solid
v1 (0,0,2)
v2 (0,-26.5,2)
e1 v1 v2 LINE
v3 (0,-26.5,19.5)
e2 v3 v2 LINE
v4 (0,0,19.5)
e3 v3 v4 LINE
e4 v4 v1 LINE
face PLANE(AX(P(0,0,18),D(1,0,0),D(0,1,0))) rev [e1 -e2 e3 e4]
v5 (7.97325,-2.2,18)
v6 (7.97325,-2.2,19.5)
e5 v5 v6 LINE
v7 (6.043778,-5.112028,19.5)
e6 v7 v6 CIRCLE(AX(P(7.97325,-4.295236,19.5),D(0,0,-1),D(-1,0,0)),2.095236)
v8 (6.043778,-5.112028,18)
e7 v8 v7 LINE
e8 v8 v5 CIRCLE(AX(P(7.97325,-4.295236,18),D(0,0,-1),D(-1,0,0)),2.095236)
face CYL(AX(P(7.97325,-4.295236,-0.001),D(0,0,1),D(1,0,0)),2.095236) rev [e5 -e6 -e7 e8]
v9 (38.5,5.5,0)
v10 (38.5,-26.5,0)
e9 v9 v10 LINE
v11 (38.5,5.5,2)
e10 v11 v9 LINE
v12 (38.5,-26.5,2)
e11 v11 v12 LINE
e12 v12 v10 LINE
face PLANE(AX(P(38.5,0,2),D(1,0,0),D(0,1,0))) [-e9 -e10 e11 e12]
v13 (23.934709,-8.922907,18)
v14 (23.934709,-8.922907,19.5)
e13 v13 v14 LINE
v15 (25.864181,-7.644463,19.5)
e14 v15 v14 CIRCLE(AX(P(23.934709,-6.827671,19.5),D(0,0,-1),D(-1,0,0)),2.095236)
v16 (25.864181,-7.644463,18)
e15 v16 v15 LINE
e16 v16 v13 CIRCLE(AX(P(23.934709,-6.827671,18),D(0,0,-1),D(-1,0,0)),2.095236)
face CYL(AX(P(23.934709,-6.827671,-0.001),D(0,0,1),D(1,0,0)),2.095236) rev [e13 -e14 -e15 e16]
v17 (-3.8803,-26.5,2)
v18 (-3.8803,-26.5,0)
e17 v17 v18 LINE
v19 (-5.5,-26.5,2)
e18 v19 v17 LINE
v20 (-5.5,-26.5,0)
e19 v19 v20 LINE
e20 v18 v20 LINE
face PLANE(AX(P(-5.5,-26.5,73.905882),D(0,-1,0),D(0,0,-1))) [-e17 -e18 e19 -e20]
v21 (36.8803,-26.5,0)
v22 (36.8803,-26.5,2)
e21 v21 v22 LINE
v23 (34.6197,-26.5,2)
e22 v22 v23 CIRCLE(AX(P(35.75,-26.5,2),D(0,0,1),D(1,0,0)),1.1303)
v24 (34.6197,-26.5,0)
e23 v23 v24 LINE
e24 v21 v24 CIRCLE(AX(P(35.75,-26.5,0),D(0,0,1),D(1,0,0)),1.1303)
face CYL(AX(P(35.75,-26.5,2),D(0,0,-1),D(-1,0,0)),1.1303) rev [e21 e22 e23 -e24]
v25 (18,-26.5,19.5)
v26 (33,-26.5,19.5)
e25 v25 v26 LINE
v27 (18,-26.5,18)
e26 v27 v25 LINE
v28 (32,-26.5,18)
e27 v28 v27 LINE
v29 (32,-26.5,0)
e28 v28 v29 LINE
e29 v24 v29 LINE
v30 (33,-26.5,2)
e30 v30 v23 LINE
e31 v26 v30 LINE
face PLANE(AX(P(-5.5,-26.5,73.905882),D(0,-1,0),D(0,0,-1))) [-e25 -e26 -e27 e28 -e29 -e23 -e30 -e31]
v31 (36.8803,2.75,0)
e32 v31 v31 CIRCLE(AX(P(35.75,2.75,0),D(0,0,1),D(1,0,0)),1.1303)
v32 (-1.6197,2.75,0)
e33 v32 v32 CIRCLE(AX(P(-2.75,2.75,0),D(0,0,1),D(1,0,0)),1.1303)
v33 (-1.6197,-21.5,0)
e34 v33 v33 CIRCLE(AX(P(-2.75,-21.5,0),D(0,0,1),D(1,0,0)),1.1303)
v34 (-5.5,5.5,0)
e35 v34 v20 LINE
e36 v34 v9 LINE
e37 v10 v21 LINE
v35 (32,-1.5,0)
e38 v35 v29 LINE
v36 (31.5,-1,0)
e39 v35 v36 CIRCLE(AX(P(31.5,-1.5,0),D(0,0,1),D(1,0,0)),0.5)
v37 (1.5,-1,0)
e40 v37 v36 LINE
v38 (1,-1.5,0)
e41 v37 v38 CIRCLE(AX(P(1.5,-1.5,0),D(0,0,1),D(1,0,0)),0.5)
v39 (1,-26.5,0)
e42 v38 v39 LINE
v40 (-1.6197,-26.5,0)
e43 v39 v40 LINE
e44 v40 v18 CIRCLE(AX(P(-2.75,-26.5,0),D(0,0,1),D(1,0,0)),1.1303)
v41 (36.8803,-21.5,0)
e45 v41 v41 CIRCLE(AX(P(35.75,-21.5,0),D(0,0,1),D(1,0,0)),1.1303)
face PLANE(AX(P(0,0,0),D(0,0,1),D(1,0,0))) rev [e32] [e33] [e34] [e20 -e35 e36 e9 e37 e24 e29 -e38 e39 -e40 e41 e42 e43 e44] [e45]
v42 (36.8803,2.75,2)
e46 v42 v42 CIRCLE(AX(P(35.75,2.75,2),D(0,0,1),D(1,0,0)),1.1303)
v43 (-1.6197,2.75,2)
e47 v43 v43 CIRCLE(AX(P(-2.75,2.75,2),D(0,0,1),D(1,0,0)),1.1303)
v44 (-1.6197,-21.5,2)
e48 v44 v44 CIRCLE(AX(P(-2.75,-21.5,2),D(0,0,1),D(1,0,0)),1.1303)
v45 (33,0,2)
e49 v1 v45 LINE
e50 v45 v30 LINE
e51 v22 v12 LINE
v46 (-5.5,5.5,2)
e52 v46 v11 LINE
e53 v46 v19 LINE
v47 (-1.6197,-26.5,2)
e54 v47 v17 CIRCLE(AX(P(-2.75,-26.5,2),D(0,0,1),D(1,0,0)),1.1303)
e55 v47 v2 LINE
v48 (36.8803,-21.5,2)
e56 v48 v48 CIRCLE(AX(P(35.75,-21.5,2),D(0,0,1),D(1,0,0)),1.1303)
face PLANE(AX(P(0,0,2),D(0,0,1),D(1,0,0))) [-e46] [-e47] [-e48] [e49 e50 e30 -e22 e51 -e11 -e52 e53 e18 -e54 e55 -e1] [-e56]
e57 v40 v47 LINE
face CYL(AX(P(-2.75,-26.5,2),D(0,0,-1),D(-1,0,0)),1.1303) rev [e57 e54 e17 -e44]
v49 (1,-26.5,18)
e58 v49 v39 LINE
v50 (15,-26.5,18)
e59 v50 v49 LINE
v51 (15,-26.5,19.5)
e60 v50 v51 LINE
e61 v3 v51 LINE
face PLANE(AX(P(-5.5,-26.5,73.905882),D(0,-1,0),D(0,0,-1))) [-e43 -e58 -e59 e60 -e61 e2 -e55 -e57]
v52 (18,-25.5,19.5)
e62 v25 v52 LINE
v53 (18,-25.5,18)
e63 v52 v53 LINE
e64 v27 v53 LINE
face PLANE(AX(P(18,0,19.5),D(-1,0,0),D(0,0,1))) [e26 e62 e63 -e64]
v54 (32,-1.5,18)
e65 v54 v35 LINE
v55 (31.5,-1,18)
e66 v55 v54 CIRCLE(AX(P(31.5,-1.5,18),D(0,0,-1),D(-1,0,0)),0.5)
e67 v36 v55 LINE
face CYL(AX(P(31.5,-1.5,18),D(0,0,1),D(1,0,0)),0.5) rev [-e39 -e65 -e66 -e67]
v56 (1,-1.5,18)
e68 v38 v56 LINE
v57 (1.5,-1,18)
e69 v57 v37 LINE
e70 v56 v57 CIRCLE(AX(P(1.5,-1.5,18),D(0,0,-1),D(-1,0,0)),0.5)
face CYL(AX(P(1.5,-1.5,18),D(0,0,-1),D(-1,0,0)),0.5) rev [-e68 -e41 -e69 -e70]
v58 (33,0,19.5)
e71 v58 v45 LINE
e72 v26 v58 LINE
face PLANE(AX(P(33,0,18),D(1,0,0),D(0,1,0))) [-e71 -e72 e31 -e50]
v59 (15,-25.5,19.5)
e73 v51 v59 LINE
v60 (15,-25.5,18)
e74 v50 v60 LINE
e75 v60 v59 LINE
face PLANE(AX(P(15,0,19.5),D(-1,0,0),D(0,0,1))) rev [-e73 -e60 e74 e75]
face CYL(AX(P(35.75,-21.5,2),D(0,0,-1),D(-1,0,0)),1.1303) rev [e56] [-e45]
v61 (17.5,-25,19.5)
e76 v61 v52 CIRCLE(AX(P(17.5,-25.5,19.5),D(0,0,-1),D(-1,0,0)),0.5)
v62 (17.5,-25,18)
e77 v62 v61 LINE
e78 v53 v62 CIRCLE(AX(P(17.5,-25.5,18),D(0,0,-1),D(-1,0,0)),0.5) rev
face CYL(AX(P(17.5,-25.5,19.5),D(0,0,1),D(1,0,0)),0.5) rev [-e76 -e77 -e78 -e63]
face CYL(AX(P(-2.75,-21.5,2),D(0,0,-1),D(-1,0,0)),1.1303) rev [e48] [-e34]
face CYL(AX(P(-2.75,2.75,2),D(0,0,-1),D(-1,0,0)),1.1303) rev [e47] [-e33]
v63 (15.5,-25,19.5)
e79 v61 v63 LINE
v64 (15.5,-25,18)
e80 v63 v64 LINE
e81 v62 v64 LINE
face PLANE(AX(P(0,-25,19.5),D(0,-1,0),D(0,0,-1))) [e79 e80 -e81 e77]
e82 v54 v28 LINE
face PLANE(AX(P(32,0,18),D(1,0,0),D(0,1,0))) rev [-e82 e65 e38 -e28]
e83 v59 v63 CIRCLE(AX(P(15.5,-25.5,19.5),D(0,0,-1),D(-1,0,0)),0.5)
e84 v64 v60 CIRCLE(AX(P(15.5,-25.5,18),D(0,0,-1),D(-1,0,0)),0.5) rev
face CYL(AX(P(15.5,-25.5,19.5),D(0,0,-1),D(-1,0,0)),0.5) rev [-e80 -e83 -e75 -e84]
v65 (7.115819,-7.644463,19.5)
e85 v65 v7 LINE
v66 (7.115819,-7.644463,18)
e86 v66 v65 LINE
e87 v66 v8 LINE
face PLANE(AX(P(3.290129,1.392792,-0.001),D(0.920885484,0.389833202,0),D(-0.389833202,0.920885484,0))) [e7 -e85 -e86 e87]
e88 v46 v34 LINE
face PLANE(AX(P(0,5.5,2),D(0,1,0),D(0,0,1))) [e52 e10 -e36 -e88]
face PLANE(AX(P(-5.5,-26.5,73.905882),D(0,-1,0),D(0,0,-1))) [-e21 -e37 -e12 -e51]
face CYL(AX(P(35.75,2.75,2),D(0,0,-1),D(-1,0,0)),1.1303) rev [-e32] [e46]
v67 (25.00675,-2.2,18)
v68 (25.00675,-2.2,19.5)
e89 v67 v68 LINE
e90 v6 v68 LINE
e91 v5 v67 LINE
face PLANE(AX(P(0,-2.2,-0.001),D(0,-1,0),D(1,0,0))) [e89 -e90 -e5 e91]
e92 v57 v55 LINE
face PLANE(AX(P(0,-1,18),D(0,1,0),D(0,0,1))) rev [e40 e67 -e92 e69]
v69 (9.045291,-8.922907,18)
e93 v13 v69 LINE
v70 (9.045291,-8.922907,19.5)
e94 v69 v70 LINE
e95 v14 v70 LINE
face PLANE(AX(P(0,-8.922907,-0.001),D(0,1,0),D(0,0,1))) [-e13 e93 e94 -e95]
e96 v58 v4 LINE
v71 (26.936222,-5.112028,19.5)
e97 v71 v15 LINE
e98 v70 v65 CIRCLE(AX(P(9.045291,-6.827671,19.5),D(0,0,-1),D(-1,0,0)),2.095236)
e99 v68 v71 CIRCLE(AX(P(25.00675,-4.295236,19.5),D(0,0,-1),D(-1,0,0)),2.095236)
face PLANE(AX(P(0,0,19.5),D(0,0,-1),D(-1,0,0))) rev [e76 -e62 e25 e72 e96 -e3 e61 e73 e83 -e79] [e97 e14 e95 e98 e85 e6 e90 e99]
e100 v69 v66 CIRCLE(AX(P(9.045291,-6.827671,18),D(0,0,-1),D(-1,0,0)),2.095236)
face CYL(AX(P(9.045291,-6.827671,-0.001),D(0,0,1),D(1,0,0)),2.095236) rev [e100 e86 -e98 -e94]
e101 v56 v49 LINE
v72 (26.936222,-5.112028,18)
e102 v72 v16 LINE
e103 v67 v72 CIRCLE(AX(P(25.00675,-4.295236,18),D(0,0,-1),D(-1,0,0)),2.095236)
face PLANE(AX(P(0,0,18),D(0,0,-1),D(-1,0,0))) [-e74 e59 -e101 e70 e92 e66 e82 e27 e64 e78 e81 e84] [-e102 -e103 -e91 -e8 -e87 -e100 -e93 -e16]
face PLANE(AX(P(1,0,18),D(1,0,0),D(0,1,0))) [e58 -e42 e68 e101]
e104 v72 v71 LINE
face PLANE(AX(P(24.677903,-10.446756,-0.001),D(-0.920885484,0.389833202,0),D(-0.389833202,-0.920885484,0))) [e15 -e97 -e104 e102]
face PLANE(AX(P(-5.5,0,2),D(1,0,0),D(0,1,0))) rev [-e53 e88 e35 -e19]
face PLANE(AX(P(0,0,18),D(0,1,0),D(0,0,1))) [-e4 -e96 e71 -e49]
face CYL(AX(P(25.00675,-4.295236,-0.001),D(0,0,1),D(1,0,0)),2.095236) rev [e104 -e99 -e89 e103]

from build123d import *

# Parameters (mm, degrees)
SKETCH1_W                   = 33
SKETCH1_H                   = 53
SKETCH1_W_2                 = 31
SKETCH1_H_2                 = 51
WALL_HEIGHT_DEPTH           = 18
ROOF_START                  = 18
SKETCH1_3_W                 = 33
SKETCH1_3_H                 = 53
SKETCH1_3_W_2               = 3
SKETCH1_3_H_2               = 3
ROOF_DEPTH                  = 1.5
SKETCH1_5_W                 = 44
SKETCH1_5_H                 = 64
SKETCH1_5_R                 = 1.1303
SKETCH1_5_W_2               = 33
SKETCH1_5_H_2               = 53
SCREW_LIP_DEPTH             = 2
MICRO_D_START               = 18
MICRO_D_FEMALE_CUTOUT_DEPTH = 1.5
FILLET1_R                   = 0.5
SKETCH4_W                   = 44
SKETCH4_H                   = 32
CUT_EXTRUDE3_DEPTH          = 19.5


# Read off the part's stored shape, not the designer's step: Micro-D Female Cutout
with BuildPart() as part:
    # Sketch1 → Wall_Height (new body)
    with BuildSketch(Plane.XY):
        with Locations((16.5, -26.5)):
            Rectangle(SKETCH1_W, SKETCH1_H)
        with Locations((16.5, -26.5)):
            Rectangle(SKETCH1_W_2, SKETCH1_H_2, mode=Mode.SUBTRACT)
    extrude(amount=WALL_HEIGHT_DEPTH)

    # Sketch1<3> → Roof (add)
    with BuildSketch(Plane.XY.offset(ROOF_START)):
        with Locations((16.5, -26.5)):
            Rectangle(SKETCH1_3_W, SKETCH1_3_H)
        with Locations((16.5, -26.5)):
            Rectangle(SKETCH1_3_W_2, SKETCH1_3_H_2, mode=Mode.SUBTRACT)
    extrude(amount=ROOF_DEPTH)

    # Sketch1<5> → Screw_Lip (add)
    with BuildSketch(Plane.XY):
        with Locations((16.5, -26.5)):
            Rectangle(SKETCH1_5_W, SKETCH1_5_H)
        with Locations((35.75, -31.5)):
            Circle(SKETCH1_5_R, mode=Mode.SUBTRACT)
        with Locations((35.75, -21.5)):
            Circle(SKETCH1_5_R, mode=Mode.SUBTRACT)
        with Locations((-2.75, -31.5)):
            Circle(SKETCH1_5_R, mode=Mode.SUBTRACT)
        with Locations((-2.75, -21.5)):
            Circle(SKETCH1_5_R, mode=Mode.SUBTRACT)
        with Locations((35.75, -55.75)):
            Circle(SKETCH1_5_R, mode=Mode.SUBTRACT)
        with Locations((35.75, -26.5)):
            Circle(SKETCH1_5_R, mode=Mode.SUBTRACT)
        with Locations((-2.75, -26.5)):
            Circle(SKETCH1_5_R, mode=Mode.SUBTRACT)
        with Locations((-2.75, -55.75)):
            Circle(SKETCH1_5_R, mode=Mode.SUBTRACT)
        with Locations((-2.75, 2.75)):
            Circle(SKETCH1_5_R, mode=Mode.SUBTRACT)
        with Locations((35.75, 2.75)):
            Circle(SKETCH1_5_R, mode=Mode.SUBTRACT)
        with Locations((16.5, -26.5)):
            Rectangle(SKETCH1_5_W_2, SKETCH1_5_H_2, mode=Mode.SUBTRACT)
    extrude(amount=SCREW_LIP_DEPTH)

    # Micro-D Female Cutout outline → Micro-D Female Cutout (cut)
    with BuildSketch(Plane.XY.offset(MICRO_D_START)):
        with BuildLine():
            Line((9.045291306, -8.922906796), (23.934708694, -8.922906796))
            ThreePointArc((23.934708694, -8.922906796), (25.091998708, -8.574294286), (25.86418098, -7.644463442))
            Line((25.86418098, -7.644463442), (26.936222286, -5.112028361))
            ThreePointArc((26.936222286, -5.112028361), (26.753373348, -3.137945843), (25.00675, -2.2))
            Line((25.00675, -2.2), (7.97325, -2.2))
            ThreePointArc((7.97325, -2.2), (6.226626652, -3.137945843), (6.043777714, -5.112028361))
            Line((6.043777714, -5.112028361), (7.11581902, -7.644463442))
            ThreePointArc((7.11581902, -7.644463442), (7.888001292, -8.574294286), (9.045291306, -8.922906796))
        make_face()
    micro_d_female_cutout = extrude(amount=MICRO_D_FEMALE_CUTOUT_DEPTH, mode=Mode.SUBTRACT)

    # Micro-D Cutout Mirror: Micro-D Female Cutout across plane
    add(micro_d_female_cutout.mirror(Plane.ZX.offset(-26.5)), mode=Mode.SUBTRACT)

    # Fillet1
    fillet1_edges = [part.edges().sort_by_distance(p)[0] for p in [
        (1, -1, 9),
        (1, -52, 9),
        (32, -52, 9),
        (32, -1, 9),
        (15, -28, 18.75),
        (18, -28, 18.75),
        (18, -25, 18.75),
        (15, -25, 18.75),
    ]]
    fillet(fillet1_edges, radius=FILLET1_R)

    # Sketch4 → Cut-Extrude3 (cut)
    with BuildSketch(Plane.XY):
        with Locations((16.5, -42.5)):
            Rectangle(SKETCH4_W, SKETCH4_H)
    extrude(amount=CUT_EXTRUDE3_DEPTH, mode=Mode.SUBTRACT)


solid = part.part
